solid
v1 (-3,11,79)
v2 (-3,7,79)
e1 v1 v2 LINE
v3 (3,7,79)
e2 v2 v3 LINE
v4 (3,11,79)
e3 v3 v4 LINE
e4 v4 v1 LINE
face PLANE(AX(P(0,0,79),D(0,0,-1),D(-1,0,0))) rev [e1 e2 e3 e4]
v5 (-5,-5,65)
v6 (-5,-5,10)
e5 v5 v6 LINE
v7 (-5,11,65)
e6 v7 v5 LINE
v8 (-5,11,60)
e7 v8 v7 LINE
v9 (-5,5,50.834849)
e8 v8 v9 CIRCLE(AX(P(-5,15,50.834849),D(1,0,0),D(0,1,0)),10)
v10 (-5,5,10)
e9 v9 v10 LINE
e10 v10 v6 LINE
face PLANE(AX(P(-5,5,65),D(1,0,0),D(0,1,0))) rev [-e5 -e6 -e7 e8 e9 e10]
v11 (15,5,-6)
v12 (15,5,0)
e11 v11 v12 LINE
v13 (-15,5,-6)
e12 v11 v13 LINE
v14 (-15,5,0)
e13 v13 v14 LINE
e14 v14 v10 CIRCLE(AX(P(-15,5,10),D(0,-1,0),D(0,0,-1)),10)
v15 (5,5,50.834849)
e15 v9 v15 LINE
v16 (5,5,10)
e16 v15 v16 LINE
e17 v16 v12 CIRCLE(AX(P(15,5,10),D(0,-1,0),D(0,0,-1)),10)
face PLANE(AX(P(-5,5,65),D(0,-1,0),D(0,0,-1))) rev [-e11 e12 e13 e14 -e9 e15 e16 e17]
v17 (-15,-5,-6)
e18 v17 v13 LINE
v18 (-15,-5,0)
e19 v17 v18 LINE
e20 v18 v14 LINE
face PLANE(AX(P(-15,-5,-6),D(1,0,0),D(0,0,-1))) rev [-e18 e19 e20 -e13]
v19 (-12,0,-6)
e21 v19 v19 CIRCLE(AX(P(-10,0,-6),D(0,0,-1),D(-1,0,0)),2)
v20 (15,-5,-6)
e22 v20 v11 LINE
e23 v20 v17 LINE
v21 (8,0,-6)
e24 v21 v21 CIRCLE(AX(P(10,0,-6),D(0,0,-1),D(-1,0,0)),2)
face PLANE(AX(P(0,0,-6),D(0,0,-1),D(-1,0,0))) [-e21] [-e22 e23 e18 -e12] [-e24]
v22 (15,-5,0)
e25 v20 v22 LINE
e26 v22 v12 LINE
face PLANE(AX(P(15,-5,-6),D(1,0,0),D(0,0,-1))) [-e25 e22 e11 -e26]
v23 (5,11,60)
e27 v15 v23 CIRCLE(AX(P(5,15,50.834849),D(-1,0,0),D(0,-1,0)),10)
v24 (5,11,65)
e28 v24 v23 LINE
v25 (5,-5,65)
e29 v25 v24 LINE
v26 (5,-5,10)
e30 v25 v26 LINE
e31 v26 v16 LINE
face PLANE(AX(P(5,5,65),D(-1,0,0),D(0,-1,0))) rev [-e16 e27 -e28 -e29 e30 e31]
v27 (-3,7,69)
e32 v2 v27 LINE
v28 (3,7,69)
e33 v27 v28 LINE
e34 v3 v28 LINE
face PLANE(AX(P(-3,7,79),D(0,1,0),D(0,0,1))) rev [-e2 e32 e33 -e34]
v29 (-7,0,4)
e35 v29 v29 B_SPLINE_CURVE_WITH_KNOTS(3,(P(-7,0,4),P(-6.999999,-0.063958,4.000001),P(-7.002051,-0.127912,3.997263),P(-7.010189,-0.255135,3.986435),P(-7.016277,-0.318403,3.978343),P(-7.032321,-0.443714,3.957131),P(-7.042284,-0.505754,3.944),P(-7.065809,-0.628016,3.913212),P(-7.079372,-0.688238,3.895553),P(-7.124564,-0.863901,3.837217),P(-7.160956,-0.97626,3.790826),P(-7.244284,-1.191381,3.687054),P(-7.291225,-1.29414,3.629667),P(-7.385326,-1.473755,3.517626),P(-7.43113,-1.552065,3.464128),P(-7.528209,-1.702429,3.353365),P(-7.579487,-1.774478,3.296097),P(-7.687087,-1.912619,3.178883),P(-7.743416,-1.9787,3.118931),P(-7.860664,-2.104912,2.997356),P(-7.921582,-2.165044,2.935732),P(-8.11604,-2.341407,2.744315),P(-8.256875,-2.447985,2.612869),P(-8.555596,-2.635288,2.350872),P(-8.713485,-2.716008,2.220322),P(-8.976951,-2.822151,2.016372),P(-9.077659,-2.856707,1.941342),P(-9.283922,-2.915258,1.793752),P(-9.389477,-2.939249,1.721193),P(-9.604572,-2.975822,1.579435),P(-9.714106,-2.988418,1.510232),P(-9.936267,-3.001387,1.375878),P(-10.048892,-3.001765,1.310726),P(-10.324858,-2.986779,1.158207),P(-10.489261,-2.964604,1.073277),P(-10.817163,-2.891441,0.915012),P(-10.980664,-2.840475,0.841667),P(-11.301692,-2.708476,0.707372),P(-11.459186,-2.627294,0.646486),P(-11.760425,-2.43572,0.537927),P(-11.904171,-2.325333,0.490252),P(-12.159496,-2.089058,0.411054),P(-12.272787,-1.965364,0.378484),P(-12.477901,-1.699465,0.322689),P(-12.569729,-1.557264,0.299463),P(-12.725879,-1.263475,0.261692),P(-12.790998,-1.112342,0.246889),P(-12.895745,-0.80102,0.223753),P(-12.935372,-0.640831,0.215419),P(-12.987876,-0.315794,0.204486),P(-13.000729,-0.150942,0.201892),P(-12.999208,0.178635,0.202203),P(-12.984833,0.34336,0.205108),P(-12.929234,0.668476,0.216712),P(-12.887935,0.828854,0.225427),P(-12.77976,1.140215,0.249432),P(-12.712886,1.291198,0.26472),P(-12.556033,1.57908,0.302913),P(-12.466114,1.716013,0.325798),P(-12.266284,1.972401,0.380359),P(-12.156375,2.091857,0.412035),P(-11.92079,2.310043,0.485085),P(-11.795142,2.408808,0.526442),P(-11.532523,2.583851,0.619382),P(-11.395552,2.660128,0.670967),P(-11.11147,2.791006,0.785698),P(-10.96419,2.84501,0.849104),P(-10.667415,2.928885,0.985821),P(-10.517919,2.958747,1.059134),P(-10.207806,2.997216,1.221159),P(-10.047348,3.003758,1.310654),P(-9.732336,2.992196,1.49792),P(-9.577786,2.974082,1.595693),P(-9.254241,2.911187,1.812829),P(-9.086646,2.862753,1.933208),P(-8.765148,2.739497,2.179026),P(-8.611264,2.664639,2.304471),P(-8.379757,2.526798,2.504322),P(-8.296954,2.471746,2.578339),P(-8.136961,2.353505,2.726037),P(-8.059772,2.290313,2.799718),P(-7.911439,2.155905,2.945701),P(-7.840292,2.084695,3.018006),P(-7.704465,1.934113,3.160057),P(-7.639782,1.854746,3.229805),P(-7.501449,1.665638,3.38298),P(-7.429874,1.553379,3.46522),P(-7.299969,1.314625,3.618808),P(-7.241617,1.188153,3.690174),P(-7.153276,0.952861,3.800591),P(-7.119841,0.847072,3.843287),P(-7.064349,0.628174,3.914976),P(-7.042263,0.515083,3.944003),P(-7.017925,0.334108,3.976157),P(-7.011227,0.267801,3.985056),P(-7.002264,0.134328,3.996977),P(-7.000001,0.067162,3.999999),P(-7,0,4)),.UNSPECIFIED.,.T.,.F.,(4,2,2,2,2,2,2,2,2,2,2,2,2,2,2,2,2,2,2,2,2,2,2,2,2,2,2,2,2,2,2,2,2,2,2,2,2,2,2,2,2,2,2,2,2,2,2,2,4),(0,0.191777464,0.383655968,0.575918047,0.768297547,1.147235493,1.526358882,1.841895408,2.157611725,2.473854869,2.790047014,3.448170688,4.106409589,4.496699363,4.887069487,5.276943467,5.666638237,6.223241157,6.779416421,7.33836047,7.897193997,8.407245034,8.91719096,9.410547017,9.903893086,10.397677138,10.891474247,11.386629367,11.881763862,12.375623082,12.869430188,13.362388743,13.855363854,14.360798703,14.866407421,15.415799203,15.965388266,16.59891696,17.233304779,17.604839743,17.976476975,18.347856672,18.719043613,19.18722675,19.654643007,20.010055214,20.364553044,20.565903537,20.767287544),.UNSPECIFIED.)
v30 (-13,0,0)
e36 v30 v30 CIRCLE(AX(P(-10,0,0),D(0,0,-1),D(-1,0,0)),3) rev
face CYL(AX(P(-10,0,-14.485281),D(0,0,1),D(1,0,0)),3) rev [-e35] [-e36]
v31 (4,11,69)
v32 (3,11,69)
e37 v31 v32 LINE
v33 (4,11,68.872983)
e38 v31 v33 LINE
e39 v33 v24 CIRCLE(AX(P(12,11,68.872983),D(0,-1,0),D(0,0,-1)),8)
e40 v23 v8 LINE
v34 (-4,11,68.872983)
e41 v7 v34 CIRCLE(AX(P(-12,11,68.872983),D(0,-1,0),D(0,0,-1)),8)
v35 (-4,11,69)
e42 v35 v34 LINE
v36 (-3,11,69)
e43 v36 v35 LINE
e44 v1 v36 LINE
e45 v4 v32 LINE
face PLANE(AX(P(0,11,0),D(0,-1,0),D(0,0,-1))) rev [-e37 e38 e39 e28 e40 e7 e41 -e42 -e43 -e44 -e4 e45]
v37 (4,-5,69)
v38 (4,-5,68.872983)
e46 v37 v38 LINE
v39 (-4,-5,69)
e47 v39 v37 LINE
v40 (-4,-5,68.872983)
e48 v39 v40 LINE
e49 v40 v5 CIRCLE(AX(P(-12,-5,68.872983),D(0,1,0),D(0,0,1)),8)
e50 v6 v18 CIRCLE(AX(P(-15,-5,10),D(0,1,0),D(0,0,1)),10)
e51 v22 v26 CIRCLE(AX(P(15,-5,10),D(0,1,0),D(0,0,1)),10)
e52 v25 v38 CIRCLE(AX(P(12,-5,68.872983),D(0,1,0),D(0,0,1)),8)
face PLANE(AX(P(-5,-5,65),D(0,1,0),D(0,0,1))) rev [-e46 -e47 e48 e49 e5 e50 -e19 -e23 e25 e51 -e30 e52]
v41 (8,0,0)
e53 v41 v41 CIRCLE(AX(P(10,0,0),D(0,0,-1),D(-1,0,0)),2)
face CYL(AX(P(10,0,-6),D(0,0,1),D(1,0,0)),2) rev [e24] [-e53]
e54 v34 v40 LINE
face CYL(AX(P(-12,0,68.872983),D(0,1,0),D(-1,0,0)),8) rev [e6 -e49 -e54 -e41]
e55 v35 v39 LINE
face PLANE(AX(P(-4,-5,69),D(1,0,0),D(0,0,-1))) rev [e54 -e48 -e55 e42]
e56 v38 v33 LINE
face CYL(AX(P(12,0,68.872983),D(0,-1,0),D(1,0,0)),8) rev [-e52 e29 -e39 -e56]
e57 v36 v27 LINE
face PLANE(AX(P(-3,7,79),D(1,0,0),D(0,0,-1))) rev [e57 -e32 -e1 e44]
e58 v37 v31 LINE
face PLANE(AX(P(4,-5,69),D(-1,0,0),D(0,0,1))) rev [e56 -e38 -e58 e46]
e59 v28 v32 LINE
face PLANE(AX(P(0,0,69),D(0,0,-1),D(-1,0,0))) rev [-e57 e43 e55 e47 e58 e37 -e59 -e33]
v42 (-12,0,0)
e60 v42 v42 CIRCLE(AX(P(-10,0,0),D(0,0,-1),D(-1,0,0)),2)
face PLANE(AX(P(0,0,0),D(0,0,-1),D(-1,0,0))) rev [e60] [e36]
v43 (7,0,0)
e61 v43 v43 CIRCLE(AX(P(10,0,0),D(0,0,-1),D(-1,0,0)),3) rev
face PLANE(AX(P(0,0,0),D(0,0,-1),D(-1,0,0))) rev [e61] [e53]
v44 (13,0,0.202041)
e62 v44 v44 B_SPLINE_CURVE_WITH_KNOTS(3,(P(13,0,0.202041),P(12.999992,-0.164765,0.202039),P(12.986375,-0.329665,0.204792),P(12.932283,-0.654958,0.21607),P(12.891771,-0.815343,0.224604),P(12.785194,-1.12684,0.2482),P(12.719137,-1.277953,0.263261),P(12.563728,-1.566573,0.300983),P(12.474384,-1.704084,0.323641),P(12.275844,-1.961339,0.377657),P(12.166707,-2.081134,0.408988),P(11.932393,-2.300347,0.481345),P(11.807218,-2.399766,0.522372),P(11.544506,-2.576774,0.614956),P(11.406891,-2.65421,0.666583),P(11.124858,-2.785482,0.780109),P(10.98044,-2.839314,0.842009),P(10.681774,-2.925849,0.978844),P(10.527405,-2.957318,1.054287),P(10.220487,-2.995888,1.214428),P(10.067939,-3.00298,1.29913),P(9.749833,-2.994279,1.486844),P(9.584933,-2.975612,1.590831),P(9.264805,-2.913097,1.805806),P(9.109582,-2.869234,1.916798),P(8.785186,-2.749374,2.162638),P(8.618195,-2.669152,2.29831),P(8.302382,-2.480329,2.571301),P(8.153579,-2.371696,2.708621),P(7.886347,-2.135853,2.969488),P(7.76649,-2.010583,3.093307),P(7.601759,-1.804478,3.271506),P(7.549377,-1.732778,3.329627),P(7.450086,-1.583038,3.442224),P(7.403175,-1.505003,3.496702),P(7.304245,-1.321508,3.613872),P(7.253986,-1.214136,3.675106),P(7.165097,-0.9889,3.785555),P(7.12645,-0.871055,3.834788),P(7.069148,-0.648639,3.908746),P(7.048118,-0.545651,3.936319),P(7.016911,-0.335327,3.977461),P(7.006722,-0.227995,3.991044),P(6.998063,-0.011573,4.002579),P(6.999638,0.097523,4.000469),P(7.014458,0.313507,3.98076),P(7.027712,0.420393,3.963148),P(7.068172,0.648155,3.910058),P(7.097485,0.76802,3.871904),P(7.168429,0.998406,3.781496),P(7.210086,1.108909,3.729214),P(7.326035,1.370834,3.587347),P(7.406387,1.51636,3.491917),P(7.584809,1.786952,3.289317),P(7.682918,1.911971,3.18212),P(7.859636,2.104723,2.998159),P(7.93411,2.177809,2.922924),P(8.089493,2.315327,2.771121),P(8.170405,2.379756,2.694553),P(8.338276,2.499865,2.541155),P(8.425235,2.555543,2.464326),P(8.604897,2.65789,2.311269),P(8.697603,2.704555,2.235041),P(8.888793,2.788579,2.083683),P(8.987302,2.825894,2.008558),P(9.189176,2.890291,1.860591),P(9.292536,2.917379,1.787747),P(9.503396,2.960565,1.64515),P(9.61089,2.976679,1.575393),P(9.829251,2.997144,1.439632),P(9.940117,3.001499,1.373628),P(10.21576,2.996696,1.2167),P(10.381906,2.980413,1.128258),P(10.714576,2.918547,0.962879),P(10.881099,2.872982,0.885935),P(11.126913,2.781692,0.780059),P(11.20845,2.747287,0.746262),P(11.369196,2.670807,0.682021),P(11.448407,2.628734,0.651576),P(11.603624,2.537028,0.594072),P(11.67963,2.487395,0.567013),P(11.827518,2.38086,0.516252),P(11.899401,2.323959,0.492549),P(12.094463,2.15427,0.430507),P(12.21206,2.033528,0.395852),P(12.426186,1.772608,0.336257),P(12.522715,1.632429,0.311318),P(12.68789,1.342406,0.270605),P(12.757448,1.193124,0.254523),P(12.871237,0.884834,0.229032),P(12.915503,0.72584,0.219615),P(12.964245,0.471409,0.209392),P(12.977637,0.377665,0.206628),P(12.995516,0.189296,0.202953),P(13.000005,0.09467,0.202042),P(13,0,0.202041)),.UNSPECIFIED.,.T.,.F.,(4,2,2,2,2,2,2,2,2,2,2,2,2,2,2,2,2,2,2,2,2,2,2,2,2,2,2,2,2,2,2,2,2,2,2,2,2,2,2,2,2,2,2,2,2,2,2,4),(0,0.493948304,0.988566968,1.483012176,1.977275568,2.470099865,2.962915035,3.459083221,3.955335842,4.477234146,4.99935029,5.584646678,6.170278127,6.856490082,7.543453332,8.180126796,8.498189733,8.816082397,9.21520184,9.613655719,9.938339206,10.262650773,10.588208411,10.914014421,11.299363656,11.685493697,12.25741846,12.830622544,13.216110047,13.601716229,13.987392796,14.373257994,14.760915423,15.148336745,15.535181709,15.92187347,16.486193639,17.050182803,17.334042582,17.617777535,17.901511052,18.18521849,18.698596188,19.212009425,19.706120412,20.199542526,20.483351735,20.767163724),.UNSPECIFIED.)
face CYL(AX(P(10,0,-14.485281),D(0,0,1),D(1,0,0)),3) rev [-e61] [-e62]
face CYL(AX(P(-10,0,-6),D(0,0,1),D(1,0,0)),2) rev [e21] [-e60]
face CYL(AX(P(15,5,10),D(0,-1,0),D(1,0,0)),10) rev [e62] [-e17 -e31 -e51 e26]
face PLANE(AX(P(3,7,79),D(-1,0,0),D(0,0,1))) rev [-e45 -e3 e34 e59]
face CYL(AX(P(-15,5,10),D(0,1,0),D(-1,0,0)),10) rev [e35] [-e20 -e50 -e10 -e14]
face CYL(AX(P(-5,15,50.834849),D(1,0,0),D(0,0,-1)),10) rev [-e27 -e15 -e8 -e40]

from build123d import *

# Parameters (mm, degrees)
SKETCH1_W           = 10
SKETCH1_H           = 10
BOSS_EXTRUDE1_DEPTH = 65
SKETCH2_W           = 30
SKETCH2_H           = 10
SKETCH2_R           = 2
BOSS_EXTRUDE2_DEPTH = 6
SKETCH3_W           = 10
SKETCH3_H           = 5
BOSS_EXTRUDE3_DEPTH = 6
SKETCH4_W           = 8
SKETCH4_H           = 16
BOSS_EXTRUDE4_DEPTH = 4
SKETCH5_W           = 6
SKETCH5_H           = 4
BOSS_EXTRUDE5_DEPTH = 10
FILLET1_START       = 2.0000001
FILLET1_DEPTH       = 2.9999999
FILLET1_START_2     = -5
FILLET1_2_DEPTH     = 2.999999286
FILLET1_START_3     = -2.000000714
FILLET1_3_DEPTH     = 4.000000814
FILLET1_4_DEPTH     = 10
FILLET1_5_OUTLINE_R = 2
FILLET1_5_DEPTH     = 11
SKETCH6_R           = 3
CUT_EXTRUDE1_DEPTH  = 69
FILLET2_R           = 8


with BuildPart() as part:
    # Sketch1 → Boss-Extrude1 (new body)
    with BuildSketch(Plane.XY):
        Rectangle(SKETCH1_W, SKETCH1_H)
    extrude(amount=BOSS_EXTRUDE1_DEPTH)

    # Sketch2 → Boss-Extrude2 (add)
    with BuildSketch(Plane(origin=(0, 0, 0), x_dir=(-1, 0, 0), z_dir=(0, 0, -1))):
        Rectangle(SKETCH2_W, SKETCH2_H)
        with Locations((-10, 0)):
            Circle(SKETCH2_R, mode=Mode.SUBTRACT)
        with Locations((10, 0)):
            Circle(SKETCH2_R, mode=Mode.SUBTRACT)
    extrude(amount=BOSS_EXTRUDE2_DEPTH)

    # Sketch3 → Boss-Extrude3 (add)
    with BuildSketch(Plane(origin=(0, 5, 0), x_dir=(1, 0, 0), z_dir=(0, 1, 0))):
        with Locations((0, -62.5)):
            Rectangle(SKETCH3_W, SKETCH3_H)
    extrude(amount=BOSS_EXTRUDE3_DEPTH)

    # Sketch4 → Boss-Extrude4 (add)
    with BuildSketch(Plane.XY.offset(65)):
        with Locations((0, 3)):
            Rectangle(SKETCH4_W, SKETCH4_H)
    extrude(amount=BOSS_EXTRUDE4_DEPTH)

    # Sketch5 → Boss-Extrude5 (add)
    with BuildSketch(Plane.XY.offset(69)):
        with Locations((0, 9)):
            Rectangle(SKETCH5_W, SKETCH5_H)
    extrude(amount=BOSS_EXTRUDE5_DEPTH)

    # Fillet1: read off the stored shape, not the designer's step
    # Fillet1 outline → Fillet1 (add)
    with BuildSketch(Plane(origin=(0, 0, 0), x_dir=(1, 0, 0), z_dir=(0, 1, 0)).offset(FILLET1_START)):
        with BuildLine():
            ThreePointArc((-15, 0), (-7.928932188, -2.928932188), (-5, -10))
            Line((-5, -10), (-5, 0))
            Line((-5, 0), (-15, 0))
        make_face()
        with BuildLine():
            Line((5, 0), (5, -10))
            ThreePointArc((5, -10), (7.928932188, -2.928932188), (15, 0))
            Line((15, 0), (5, 0))
        make_face()
    extrude(amount=FILLET1_DEPTH)

    # Fillet1 2 outline → Fillet1 2 (add)
    with BuildSketch(Plane(origin=(0, 0, 0), x_dir=(1, 0, 0), z_dir=(0, 1, 0)).offset(FILLET1_START_2)):
        with BuildLine():
            ThreePointArc((-15, 0), (-7.928932188, -2.928932188), (-5, -10))
            Line((-5, -10), (-5, 0))
            Line((-5, 0), (-15, 0))
        make_face()
        with BuildLine():
            Line((5, 0), (5, -10))
            ThreePointArc((5, -10), (7.928932188, -2.928932188), (15, 0))
            Line((15, 0), (5, 0))
        make_face()
    extrude(amount=FILLET1_2_DEPTH)

    # Fillet1 3 outline → Fillet1 3 (add)
    with BuildSketch(Plane(origin=(0, 0, 0), x_dir=(1, 0, 0), z_dir=(0, 1, 0)).offset(FILLET1_START_3)):
        with BuildLine():
            ThreePointArc((-15, 0), (-7.928932188, -2.928932188), (-5, -10))
            Line((-5, -10), (-5, 0))
            Line((-5, 0), (-15, 0))
        make_face()
        with BuildLine():
            Line((5, 0), (5, -10))
            ThreePointArc((5, -10), (7.928932188, -2.928932188), (15, 0))
            Line((15, 0), (5, 0))
        make_face()
    extrude(amount=FILLET1_3_DEPTH)

    # Fillet1 4 outline → Fillet1 4 (add)
    with BuildSketch(Plane.YZ.offset(FILLET1_START_2)):
        with BuildLine():
            ThreePointArc((5, 50.83484861), (6.633399735, 56.312074185), (11, 60))
            Line((11, 60), (5, 60))
            Line((5, 60), (5, 50.83484861))
        make_face()
    extrude(amount=FILLET1_4_DEPTH)

    # Fillet1 5 outline → Fillet1 5 (cut)
    with BuildSketch(Plane.XY):
        with Locations((10, 0)):
            Circle(FILLET1_5_OUTLINE_R)
        with Locations((-10, 0)):
            Circle(FILLET1_5_OUTLINE_R)
    extrude(amount=FILLET1_5_DEPTH, mode=Mode.SUBTRACT)

    # Sketch6 → Cut-Extrude1 (cut)
    with BuildSketch(Plane.XY.offset(69)):
        with Locations((-10, 0)):
            Circle(SKETCH6_R)
        with Locations((10, 0)):
            Circle(SKETCH6_R)
    extrude(amount=-CUT_EXTRUDE1_DEPTH, mode=Mode.SUBTRACT)

    # Fillet2
    # the kernel refuses this fillet: 8 mm, written as the material it adds along each edge
    with BuildSketch(Plane(origin=(4, -5, 65), x_dir=(1, 0, 0), z_dir=(0, 1, 0))) as fillet2_piece_1:
        with BuildLine():
            CenterArc((8, -3.872983346), FILLET2_R, 151.044975628, 28.955024372)
            Line((0, -3.872983346), (0, 0))
            Line((0, 0), (1, 0))
        make_face()
    extrude(amount=16)
    with BuildSketch(Plane(origin=(-4, 11, 65), x_dir=(0, 0, 1), z_dir=(0, -1, 0))) as fillet2_piece_2:
        with BuildLine():
            CenterArc((3.872983346, 8), FILLET2_R, 241.044975628, 28.955024372)
            Line((0, 1), (0, 0))
            Line((0, 0), (3.872983346, 0))
        make_face()
    extrude(amount=16)


solid = part.part
